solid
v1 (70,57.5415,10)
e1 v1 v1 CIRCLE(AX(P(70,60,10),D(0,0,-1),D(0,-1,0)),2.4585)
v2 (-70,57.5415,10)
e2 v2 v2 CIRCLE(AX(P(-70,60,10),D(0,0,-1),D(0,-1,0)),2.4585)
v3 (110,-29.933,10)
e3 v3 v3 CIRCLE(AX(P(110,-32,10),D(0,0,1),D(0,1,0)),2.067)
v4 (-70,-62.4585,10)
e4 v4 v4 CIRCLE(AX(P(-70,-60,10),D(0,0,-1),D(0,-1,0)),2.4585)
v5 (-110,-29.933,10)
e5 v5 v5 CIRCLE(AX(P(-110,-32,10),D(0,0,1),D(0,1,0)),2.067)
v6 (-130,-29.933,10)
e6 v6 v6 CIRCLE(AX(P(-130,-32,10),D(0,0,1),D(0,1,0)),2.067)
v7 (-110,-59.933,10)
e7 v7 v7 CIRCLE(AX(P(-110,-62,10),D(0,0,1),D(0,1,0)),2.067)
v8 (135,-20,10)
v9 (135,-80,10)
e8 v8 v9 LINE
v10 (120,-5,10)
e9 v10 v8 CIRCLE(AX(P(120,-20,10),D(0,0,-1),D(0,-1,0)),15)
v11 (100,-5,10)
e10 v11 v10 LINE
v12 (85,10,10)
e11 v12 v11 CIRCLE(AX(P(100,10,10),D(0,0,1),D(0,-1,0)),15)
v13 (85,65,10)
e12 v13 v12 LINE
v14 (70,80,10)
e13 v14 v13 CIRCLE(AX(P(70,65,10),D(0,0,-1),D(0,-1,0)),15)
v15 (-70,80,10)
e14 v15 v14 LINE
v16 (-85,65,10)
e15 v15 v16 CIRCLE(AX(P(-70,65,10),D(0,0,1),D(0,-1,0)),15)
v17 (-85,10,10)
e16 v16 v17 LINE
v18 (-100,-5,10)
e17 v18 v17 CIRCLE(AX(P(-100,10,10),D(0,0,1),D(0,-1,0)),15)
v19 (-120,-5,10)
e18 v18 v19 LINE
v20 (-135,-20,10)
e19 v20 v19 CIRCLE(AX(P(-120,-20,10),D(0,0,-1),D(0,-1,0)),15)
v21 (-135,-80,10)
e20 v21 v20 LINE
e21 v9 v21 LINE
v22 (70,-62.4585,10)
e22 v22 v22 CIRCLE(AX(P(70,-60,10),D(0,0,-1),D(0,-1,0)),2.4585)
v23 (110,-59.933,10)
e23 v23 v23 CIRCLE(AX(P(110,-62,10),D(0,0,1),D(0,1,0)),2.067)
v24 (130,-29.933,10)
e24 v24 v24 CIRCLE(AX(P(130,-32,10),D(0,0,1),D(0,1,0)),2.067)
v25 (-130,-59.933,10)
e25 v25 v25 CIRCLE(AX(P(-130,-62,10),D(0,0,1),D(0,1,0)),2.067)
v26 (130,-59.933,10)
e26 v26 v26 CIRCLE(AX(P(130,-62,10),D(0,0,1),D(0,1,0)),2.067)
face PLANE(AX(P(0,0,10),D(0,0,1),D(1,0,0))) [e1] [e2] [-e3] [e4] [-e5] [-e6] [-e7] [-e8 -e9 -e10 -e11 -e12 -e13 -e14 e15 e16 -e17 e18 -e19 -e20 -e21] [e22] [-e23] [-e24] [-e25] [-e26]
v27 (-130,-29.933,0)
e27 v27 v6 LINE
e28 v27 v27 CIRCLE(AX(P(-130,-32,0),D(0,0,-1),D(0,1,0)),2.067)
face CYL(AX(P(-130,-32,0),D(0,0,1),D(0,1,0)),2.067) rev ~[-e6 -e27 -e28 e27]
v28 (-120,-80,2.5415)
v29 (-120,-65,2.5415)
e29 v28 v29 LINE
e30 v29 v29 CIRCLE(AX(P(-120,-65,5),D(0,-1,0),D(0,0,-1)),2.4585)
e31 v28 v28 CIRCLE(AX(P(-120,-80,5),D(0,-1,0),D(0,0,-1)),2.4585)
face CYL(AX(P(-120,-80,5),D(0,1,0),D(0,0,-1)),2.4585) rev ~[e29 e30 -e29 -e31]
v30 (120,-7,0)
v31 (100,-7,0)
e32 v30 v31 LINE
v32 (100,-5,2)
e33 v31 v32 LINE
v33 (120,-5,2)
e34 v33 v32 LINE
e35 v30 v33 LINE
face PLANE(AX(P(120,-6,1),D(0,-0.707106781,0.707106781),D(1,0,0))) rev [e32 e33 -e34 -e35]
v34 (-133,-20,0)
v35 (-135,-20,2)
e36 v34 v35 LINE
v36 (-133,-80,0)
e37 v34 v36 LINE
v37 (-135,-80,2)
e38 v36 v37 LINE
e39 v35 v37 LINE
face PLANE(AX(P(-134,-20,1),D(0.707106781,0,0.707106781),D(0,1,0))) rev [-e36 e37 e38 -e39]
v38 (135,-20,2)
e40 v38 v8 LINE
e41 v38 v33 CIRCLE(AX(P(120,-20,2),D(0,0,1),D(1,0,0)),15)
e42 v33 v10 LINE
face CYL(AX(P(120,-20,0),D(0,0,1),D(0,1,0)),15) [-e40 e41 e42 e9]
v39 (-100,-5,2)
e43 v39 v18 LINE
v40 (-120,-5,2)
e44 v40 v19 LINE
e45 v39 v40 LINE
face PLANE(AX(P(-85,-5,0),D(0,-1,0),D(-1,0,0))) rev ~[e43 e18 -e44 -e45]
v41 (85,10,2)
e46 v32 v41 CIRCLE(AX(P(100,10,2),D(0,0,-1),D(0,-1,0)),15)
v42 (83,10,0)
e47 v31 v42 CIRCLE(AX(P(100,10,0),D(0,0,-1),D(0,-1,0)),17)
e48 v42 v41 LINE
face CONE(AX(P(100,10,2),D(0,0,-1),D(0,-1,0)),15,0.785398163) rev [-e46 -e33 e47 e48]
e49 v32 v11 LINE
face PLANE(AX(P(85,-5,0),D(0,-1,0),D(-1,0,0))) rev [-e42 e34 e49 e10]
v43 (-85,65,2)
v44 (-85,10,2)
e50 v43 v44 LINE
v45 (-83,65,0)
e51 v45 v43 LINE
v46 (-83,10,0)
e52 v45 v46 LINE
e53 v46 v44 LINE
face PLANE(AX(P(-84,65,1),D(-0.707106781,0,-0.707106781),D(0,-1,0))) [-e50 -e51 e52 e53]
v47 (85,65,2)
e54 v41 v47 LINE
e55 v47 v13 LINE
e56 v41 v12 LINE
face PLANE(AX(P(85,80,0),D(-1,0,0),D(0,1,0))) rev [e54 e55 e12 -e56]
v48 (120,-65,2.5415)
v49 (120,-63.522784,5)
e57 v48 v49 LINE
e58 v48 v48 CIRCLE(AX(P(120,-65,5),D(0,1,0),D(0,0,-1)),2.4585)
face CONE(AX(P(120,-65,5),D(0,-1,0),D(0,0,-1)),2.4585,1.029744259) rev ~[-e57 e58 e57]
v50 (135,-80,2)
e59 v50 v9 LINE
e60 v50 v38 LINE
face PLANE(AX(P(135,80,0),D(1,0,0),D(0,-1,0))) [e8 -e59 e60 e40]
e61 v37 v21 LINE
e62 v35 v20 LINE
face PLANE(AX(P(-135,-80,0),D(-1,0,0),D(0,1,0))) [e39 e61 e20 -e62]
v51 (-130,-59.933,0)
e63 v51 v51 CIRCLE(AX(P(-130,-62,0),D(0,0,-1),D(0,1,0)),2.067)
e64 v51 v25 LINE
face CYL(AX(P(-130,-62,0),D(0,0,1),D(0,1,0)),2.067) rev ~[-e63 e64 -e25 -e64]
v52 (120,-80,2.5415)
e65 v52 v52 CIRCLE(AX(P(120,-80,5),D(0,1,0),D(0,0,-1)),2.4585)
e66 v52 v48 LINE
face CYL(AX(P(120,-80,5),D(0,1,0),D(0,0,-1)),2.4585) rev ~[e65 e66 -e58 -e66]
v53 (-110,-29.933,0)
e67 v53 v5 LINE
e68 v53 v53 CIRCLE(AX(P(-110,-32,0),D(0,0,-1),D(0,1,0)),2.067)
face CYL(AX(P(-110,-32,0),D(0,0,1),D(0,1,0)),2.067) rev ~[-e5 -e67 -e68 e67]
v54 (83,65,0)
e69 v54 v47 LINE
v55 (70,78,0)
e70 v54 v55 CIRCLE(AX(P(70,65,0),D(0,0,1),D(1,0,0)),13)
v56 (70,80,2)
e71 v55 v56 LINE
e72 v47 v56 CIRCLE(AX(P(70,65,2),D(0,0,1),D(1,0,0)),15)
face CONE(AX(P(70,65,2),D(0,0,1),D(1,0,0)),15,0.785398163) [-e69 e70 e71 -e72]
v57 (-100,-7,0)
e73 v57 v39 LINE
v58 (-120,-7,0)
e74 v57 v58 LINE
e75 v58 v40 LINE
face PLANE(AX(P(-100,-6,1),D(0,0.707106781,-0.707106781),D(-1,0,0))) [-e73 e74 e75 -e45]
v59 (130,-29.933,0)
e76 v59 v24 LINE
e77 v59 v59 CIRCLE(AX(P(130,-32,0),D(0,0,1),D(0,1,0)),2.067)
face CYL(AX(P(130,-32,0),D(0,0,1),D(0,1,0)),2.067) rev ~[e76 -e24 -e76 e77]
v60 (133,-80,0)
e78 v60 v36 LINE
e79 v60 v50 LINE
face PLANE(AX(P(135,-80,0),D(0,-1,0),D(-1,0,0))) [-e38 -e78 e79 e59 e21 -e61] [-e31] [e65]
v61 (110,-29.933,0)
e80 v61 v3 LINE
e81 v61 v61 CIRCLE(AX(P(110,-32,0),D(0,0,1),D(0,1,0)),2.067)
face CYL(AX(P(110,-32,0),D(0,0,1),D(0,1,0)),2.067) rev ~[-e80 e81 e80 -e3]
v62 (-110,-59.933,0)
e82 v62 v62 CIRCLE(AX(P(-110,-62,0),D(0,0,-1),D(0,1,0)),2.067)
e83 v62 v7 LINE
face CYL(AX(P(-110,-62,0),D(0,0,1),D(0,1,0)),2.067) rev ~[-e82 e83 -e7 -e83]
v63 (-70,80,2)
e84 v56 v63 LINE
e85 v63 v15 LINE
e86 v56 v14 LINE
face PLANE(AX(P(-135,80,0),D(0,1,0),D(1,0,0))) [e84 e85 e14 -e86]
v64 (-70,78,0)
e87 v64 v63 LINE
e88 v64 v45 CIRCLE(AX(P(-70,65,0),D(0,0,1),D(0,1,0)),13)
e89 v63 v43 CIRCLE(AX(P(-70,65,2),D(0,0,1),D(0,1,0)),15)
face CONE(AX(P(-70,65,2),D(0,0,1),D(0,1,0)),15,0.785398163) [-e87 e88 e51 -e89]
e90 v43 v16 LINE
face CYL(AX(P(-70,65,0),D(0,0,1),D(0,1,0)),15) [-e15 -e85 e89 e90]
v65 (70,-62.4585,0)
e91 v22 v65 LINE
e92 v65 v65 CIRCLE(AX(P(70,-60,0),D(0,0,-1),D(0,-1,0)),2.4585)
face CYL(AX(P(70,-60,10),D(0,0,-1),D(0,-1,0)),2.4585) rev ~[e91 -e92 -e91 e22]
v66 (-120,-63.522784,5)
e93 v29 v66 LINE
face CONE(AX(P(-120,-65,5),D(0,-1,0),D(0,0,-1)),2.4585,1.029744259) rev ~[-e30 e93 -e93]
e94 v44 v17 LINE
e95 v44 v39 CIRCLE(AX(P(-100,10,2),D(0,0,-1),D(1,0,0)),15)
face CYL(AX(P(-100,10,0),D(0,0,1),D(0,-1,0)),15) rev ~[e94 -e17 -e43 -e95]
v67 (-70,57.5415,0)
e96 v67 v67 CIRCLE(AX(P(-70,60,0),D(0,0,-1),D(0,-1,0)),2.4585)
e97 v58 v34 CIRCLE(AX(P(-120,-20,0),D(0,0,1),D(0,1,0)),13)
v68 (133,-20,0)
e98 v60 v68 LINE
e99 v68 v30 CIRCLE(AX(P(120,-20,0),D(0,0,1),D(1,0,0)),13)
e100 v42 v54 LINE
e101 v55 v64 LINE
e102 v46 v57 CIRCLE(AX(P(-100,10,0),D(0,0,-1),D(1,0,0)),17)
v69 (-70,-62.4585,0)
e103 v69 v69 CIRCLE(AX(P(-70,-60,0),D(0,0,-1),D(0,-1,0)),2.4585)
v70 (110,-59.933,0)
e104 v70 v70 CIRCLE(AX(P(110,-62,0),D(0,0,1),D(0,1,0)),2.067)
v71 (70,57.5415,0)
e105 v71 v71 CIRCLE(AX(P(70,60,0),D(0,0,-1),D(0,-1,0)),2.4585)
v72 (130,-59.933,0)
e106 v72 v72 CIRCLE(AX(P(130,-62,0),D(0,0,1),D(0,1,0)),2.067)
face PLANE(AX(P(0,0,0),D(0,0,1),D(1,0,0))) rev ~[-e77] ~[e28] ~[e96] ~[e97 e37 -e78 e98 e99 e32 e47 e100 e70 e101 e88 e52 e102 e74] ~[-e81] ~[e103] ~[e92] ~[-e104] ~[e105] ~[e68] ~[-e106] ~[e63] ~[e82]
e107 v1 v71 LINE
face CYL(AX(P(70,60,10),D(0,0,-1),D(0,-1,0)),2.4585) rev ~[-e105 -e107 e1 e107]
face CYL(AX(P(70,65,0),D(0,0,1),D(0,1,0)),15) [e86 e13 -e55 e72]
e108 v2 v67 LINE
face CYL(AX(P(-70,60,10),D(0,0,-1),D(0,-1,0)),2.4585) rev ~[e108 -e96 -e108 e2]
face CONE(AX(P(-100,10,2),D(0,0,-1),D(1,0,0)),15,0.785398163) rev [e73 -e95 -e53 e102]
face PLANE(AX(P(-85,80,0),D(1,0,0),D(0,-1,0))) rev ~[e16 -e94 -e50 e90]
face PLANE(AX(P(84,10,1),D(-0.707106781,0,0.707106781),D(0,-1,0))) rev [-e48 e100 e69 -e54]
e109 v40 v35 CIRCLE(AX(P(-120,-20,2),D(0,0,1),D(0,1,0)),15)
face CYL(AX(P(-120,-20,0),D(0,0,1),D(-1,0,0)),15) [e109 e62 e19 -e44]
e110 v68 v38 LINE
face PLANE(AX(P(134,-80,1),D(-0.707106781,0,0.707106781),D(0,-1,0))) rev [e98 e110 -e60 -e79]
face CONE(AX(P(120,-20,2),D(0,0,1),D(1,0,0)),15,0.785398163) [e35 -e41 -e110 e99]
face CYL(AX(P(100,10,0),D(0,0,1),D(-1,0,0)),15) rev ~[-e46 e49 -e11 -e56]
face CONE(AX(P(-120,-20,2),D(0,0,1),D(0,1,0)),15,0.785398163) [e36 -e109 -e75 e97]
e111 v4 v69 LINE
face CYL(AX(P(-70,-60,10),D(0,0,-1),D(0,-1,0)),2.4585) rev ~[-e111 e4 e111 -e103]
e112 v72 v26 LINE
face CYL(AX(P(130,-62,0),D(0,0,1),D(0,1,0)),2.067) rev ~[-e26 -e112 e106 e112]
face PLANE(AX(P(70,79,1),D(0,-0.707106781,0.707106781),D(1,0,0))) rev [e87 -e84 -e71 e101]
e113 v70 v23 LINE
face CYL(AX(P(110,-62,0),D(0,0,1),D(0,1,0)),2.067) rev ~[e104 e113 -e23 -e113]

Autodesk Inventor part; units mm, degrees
ref_plane "YZ Plane" through (0, 0, 0) normal (1, 0, 0) x (0, 1, 0)
ref_plane "XZ Plane" through (0, 0, 0) normal (0, 1, 0) x (-1, 0, 0)
ref_plane "XY Plane" through (0, 0, 0) normal (0, 0, 1) x (1, 0, 0)
sketch "Sketch1" plane through (0, 0, 0) normal (0, 0, 1) x (1, 0, 0)
  line L0 (135, -80) -> (-135, -80)
  line L1 (-135, -80) -> (-135, 80)
  line L2 (-135, 80) -> (135, 80)
  line L3 (135, 80) -> (135, -80)
  line L4 (135, -80) -> (-135, 80) construction
  line L5 (-135, -80) -> (135, 80) construction
  point P0 (0, 0)
  dimension "d0" = 270
  dimension "d1" = 160
extrude "Extrusion1" add sketch "Sketch1" along normal blind 10
sketch "Sketch2" plane through (0, 0, 10) normal (0, 0, 1) x (1, 0, 0)
  line L0 (70, -60) -> (-70, -60) construction
  line L1 (-70, -60) -> (-70, 60) construction
  line L2 (-70, 60) -> (70, 60) construction
  line L3 (70, 60) -> (70, -60) construction
  line L4 (70, -60) -> (-70, 60) construction
  line L5 (-70, -60) -> (70, 60) construction
  point P0 (0, 0)
  dimension "d4" = 140
  dimension "d5" = 120
hole "Hole1" at (-70, 60, 10) at (70, 60, 10) at (-70, -60, 10) at (70, -60, 10) direction (0, 0, -1) diameter 4.917 depth 25 tip angle 118 thread size "M6x1" class "6H" standard "ISO Metric profile"
sketch "Sketch3" plane through (0, 0, 0) normal (0, 0, -1) x (-1, 0, 0)
  line L0 (135, 80) -> (135, -80) construction
  line L1 (135, -80) -> (105, -80) construction
  line L2 (105, -80) -> (105, -20) construction
  line L3 (105, -20) -> (135, -20) construction
  line L4 (135, -20) -> (135, -80) construction
  line L5 (135, 80) -> (85, 80)
  line L6 (85, 80) -> (85, -5)
  line L7 (85, -5) -> (135, -5)
  line L8 (135, -5) -> (135, 80)
  point P0 (0, 0)
  dimension "d15" = 30
  dimension "d16" = 60
  dimension "d17" = 50
  dimension "d21" = 85
extrude "Extrusion2" cut sketch "Sketch3" against normal blind 10
fillet "Fillet2" radius 15 3 edges at (-85, 80, 5) (-85, -5, 5) (-135, -5, 5)
mirror "Mirror1" about plane through (0, 0, 0) normal (1, 0, 0) of "Extrusion2"
mirror "Mirror2" about plane through (0, 0, 0) normal (1, 0, 0) of "Fillet2"
sketch "Sketch4" plane through (0, 0, 0) normal (0, 0, -1) x (-1, 0, 0)
  line L0 (-130, -32) -> (-110, -32) construction
  line L1 (-110, -32) -> (-110, -62) construction
  line L2 (-110, -62) -> (-130, -62) construction
  line L3 (-130, -62) -> (-130, -32) construction
  line L4 (135, -80) -> (-135, -80) construction
  line L5 (-135, -80) -> (-135, -20) construction
  point P0 (0, 0)
  point P1 (-120, -62)
  point P2 (-130, -47)
  dimension "d22" = 20
  dimension "d23" = 30
  dimension "d24" = 18
  dimension "d25" = 5
hole "Hole2" at (130, -32, 0) at (110, -32, 0) at (110, -62, 0) at (130, -62, 0) direction (0, 0, 1) diameter 4.134 end through all thread size "M5x0.8" class "6H" standard "ISO Metric profile"
sketch "Sketch5" plane through (-135, -80, 0) normal (0, -1, 0) x (1, 0, 0)
  line L0 (270, 0) -> (270, 10) projected
  line L1 (0, 0) -> (270, 0) projected
  point P0 (135, 0)
  point P1 (255, 5)
  point P2 (270, 5)
  dimension "d33" = 15
  dimension "d34" = 5
hole "Hole3" at (120, -80, 5) direction (0, 1, 0) diameter 4.917 depth 15 tip angle 118 thread size "M6x1" class "6H" standard "ISO Metric profile"
mirror "Mirror3" about plane through (0, 0, 0) normal (1, 0, 0) of "Hole2", "Hole3"
chamfer "Chamfer2" distance 2 angle 45 13 edges at (-80.6066, 75.6066, 0) (-85, 37.5, 0) (-89.3934, -0.6066, 0) (-110, -5, 0) (-130.6066, -9.3934, 0) (-135, -50, 0) (0, 80, 0) (80.6066, 75.6066, 0) (85, 37.5, 0) (89.3934, -0.6066, 0) (110, -5, 0) (130.6066, -9.3934, 0) (135, -50, 0)
properties part number "Support_lift" material "Stainless Steel"
